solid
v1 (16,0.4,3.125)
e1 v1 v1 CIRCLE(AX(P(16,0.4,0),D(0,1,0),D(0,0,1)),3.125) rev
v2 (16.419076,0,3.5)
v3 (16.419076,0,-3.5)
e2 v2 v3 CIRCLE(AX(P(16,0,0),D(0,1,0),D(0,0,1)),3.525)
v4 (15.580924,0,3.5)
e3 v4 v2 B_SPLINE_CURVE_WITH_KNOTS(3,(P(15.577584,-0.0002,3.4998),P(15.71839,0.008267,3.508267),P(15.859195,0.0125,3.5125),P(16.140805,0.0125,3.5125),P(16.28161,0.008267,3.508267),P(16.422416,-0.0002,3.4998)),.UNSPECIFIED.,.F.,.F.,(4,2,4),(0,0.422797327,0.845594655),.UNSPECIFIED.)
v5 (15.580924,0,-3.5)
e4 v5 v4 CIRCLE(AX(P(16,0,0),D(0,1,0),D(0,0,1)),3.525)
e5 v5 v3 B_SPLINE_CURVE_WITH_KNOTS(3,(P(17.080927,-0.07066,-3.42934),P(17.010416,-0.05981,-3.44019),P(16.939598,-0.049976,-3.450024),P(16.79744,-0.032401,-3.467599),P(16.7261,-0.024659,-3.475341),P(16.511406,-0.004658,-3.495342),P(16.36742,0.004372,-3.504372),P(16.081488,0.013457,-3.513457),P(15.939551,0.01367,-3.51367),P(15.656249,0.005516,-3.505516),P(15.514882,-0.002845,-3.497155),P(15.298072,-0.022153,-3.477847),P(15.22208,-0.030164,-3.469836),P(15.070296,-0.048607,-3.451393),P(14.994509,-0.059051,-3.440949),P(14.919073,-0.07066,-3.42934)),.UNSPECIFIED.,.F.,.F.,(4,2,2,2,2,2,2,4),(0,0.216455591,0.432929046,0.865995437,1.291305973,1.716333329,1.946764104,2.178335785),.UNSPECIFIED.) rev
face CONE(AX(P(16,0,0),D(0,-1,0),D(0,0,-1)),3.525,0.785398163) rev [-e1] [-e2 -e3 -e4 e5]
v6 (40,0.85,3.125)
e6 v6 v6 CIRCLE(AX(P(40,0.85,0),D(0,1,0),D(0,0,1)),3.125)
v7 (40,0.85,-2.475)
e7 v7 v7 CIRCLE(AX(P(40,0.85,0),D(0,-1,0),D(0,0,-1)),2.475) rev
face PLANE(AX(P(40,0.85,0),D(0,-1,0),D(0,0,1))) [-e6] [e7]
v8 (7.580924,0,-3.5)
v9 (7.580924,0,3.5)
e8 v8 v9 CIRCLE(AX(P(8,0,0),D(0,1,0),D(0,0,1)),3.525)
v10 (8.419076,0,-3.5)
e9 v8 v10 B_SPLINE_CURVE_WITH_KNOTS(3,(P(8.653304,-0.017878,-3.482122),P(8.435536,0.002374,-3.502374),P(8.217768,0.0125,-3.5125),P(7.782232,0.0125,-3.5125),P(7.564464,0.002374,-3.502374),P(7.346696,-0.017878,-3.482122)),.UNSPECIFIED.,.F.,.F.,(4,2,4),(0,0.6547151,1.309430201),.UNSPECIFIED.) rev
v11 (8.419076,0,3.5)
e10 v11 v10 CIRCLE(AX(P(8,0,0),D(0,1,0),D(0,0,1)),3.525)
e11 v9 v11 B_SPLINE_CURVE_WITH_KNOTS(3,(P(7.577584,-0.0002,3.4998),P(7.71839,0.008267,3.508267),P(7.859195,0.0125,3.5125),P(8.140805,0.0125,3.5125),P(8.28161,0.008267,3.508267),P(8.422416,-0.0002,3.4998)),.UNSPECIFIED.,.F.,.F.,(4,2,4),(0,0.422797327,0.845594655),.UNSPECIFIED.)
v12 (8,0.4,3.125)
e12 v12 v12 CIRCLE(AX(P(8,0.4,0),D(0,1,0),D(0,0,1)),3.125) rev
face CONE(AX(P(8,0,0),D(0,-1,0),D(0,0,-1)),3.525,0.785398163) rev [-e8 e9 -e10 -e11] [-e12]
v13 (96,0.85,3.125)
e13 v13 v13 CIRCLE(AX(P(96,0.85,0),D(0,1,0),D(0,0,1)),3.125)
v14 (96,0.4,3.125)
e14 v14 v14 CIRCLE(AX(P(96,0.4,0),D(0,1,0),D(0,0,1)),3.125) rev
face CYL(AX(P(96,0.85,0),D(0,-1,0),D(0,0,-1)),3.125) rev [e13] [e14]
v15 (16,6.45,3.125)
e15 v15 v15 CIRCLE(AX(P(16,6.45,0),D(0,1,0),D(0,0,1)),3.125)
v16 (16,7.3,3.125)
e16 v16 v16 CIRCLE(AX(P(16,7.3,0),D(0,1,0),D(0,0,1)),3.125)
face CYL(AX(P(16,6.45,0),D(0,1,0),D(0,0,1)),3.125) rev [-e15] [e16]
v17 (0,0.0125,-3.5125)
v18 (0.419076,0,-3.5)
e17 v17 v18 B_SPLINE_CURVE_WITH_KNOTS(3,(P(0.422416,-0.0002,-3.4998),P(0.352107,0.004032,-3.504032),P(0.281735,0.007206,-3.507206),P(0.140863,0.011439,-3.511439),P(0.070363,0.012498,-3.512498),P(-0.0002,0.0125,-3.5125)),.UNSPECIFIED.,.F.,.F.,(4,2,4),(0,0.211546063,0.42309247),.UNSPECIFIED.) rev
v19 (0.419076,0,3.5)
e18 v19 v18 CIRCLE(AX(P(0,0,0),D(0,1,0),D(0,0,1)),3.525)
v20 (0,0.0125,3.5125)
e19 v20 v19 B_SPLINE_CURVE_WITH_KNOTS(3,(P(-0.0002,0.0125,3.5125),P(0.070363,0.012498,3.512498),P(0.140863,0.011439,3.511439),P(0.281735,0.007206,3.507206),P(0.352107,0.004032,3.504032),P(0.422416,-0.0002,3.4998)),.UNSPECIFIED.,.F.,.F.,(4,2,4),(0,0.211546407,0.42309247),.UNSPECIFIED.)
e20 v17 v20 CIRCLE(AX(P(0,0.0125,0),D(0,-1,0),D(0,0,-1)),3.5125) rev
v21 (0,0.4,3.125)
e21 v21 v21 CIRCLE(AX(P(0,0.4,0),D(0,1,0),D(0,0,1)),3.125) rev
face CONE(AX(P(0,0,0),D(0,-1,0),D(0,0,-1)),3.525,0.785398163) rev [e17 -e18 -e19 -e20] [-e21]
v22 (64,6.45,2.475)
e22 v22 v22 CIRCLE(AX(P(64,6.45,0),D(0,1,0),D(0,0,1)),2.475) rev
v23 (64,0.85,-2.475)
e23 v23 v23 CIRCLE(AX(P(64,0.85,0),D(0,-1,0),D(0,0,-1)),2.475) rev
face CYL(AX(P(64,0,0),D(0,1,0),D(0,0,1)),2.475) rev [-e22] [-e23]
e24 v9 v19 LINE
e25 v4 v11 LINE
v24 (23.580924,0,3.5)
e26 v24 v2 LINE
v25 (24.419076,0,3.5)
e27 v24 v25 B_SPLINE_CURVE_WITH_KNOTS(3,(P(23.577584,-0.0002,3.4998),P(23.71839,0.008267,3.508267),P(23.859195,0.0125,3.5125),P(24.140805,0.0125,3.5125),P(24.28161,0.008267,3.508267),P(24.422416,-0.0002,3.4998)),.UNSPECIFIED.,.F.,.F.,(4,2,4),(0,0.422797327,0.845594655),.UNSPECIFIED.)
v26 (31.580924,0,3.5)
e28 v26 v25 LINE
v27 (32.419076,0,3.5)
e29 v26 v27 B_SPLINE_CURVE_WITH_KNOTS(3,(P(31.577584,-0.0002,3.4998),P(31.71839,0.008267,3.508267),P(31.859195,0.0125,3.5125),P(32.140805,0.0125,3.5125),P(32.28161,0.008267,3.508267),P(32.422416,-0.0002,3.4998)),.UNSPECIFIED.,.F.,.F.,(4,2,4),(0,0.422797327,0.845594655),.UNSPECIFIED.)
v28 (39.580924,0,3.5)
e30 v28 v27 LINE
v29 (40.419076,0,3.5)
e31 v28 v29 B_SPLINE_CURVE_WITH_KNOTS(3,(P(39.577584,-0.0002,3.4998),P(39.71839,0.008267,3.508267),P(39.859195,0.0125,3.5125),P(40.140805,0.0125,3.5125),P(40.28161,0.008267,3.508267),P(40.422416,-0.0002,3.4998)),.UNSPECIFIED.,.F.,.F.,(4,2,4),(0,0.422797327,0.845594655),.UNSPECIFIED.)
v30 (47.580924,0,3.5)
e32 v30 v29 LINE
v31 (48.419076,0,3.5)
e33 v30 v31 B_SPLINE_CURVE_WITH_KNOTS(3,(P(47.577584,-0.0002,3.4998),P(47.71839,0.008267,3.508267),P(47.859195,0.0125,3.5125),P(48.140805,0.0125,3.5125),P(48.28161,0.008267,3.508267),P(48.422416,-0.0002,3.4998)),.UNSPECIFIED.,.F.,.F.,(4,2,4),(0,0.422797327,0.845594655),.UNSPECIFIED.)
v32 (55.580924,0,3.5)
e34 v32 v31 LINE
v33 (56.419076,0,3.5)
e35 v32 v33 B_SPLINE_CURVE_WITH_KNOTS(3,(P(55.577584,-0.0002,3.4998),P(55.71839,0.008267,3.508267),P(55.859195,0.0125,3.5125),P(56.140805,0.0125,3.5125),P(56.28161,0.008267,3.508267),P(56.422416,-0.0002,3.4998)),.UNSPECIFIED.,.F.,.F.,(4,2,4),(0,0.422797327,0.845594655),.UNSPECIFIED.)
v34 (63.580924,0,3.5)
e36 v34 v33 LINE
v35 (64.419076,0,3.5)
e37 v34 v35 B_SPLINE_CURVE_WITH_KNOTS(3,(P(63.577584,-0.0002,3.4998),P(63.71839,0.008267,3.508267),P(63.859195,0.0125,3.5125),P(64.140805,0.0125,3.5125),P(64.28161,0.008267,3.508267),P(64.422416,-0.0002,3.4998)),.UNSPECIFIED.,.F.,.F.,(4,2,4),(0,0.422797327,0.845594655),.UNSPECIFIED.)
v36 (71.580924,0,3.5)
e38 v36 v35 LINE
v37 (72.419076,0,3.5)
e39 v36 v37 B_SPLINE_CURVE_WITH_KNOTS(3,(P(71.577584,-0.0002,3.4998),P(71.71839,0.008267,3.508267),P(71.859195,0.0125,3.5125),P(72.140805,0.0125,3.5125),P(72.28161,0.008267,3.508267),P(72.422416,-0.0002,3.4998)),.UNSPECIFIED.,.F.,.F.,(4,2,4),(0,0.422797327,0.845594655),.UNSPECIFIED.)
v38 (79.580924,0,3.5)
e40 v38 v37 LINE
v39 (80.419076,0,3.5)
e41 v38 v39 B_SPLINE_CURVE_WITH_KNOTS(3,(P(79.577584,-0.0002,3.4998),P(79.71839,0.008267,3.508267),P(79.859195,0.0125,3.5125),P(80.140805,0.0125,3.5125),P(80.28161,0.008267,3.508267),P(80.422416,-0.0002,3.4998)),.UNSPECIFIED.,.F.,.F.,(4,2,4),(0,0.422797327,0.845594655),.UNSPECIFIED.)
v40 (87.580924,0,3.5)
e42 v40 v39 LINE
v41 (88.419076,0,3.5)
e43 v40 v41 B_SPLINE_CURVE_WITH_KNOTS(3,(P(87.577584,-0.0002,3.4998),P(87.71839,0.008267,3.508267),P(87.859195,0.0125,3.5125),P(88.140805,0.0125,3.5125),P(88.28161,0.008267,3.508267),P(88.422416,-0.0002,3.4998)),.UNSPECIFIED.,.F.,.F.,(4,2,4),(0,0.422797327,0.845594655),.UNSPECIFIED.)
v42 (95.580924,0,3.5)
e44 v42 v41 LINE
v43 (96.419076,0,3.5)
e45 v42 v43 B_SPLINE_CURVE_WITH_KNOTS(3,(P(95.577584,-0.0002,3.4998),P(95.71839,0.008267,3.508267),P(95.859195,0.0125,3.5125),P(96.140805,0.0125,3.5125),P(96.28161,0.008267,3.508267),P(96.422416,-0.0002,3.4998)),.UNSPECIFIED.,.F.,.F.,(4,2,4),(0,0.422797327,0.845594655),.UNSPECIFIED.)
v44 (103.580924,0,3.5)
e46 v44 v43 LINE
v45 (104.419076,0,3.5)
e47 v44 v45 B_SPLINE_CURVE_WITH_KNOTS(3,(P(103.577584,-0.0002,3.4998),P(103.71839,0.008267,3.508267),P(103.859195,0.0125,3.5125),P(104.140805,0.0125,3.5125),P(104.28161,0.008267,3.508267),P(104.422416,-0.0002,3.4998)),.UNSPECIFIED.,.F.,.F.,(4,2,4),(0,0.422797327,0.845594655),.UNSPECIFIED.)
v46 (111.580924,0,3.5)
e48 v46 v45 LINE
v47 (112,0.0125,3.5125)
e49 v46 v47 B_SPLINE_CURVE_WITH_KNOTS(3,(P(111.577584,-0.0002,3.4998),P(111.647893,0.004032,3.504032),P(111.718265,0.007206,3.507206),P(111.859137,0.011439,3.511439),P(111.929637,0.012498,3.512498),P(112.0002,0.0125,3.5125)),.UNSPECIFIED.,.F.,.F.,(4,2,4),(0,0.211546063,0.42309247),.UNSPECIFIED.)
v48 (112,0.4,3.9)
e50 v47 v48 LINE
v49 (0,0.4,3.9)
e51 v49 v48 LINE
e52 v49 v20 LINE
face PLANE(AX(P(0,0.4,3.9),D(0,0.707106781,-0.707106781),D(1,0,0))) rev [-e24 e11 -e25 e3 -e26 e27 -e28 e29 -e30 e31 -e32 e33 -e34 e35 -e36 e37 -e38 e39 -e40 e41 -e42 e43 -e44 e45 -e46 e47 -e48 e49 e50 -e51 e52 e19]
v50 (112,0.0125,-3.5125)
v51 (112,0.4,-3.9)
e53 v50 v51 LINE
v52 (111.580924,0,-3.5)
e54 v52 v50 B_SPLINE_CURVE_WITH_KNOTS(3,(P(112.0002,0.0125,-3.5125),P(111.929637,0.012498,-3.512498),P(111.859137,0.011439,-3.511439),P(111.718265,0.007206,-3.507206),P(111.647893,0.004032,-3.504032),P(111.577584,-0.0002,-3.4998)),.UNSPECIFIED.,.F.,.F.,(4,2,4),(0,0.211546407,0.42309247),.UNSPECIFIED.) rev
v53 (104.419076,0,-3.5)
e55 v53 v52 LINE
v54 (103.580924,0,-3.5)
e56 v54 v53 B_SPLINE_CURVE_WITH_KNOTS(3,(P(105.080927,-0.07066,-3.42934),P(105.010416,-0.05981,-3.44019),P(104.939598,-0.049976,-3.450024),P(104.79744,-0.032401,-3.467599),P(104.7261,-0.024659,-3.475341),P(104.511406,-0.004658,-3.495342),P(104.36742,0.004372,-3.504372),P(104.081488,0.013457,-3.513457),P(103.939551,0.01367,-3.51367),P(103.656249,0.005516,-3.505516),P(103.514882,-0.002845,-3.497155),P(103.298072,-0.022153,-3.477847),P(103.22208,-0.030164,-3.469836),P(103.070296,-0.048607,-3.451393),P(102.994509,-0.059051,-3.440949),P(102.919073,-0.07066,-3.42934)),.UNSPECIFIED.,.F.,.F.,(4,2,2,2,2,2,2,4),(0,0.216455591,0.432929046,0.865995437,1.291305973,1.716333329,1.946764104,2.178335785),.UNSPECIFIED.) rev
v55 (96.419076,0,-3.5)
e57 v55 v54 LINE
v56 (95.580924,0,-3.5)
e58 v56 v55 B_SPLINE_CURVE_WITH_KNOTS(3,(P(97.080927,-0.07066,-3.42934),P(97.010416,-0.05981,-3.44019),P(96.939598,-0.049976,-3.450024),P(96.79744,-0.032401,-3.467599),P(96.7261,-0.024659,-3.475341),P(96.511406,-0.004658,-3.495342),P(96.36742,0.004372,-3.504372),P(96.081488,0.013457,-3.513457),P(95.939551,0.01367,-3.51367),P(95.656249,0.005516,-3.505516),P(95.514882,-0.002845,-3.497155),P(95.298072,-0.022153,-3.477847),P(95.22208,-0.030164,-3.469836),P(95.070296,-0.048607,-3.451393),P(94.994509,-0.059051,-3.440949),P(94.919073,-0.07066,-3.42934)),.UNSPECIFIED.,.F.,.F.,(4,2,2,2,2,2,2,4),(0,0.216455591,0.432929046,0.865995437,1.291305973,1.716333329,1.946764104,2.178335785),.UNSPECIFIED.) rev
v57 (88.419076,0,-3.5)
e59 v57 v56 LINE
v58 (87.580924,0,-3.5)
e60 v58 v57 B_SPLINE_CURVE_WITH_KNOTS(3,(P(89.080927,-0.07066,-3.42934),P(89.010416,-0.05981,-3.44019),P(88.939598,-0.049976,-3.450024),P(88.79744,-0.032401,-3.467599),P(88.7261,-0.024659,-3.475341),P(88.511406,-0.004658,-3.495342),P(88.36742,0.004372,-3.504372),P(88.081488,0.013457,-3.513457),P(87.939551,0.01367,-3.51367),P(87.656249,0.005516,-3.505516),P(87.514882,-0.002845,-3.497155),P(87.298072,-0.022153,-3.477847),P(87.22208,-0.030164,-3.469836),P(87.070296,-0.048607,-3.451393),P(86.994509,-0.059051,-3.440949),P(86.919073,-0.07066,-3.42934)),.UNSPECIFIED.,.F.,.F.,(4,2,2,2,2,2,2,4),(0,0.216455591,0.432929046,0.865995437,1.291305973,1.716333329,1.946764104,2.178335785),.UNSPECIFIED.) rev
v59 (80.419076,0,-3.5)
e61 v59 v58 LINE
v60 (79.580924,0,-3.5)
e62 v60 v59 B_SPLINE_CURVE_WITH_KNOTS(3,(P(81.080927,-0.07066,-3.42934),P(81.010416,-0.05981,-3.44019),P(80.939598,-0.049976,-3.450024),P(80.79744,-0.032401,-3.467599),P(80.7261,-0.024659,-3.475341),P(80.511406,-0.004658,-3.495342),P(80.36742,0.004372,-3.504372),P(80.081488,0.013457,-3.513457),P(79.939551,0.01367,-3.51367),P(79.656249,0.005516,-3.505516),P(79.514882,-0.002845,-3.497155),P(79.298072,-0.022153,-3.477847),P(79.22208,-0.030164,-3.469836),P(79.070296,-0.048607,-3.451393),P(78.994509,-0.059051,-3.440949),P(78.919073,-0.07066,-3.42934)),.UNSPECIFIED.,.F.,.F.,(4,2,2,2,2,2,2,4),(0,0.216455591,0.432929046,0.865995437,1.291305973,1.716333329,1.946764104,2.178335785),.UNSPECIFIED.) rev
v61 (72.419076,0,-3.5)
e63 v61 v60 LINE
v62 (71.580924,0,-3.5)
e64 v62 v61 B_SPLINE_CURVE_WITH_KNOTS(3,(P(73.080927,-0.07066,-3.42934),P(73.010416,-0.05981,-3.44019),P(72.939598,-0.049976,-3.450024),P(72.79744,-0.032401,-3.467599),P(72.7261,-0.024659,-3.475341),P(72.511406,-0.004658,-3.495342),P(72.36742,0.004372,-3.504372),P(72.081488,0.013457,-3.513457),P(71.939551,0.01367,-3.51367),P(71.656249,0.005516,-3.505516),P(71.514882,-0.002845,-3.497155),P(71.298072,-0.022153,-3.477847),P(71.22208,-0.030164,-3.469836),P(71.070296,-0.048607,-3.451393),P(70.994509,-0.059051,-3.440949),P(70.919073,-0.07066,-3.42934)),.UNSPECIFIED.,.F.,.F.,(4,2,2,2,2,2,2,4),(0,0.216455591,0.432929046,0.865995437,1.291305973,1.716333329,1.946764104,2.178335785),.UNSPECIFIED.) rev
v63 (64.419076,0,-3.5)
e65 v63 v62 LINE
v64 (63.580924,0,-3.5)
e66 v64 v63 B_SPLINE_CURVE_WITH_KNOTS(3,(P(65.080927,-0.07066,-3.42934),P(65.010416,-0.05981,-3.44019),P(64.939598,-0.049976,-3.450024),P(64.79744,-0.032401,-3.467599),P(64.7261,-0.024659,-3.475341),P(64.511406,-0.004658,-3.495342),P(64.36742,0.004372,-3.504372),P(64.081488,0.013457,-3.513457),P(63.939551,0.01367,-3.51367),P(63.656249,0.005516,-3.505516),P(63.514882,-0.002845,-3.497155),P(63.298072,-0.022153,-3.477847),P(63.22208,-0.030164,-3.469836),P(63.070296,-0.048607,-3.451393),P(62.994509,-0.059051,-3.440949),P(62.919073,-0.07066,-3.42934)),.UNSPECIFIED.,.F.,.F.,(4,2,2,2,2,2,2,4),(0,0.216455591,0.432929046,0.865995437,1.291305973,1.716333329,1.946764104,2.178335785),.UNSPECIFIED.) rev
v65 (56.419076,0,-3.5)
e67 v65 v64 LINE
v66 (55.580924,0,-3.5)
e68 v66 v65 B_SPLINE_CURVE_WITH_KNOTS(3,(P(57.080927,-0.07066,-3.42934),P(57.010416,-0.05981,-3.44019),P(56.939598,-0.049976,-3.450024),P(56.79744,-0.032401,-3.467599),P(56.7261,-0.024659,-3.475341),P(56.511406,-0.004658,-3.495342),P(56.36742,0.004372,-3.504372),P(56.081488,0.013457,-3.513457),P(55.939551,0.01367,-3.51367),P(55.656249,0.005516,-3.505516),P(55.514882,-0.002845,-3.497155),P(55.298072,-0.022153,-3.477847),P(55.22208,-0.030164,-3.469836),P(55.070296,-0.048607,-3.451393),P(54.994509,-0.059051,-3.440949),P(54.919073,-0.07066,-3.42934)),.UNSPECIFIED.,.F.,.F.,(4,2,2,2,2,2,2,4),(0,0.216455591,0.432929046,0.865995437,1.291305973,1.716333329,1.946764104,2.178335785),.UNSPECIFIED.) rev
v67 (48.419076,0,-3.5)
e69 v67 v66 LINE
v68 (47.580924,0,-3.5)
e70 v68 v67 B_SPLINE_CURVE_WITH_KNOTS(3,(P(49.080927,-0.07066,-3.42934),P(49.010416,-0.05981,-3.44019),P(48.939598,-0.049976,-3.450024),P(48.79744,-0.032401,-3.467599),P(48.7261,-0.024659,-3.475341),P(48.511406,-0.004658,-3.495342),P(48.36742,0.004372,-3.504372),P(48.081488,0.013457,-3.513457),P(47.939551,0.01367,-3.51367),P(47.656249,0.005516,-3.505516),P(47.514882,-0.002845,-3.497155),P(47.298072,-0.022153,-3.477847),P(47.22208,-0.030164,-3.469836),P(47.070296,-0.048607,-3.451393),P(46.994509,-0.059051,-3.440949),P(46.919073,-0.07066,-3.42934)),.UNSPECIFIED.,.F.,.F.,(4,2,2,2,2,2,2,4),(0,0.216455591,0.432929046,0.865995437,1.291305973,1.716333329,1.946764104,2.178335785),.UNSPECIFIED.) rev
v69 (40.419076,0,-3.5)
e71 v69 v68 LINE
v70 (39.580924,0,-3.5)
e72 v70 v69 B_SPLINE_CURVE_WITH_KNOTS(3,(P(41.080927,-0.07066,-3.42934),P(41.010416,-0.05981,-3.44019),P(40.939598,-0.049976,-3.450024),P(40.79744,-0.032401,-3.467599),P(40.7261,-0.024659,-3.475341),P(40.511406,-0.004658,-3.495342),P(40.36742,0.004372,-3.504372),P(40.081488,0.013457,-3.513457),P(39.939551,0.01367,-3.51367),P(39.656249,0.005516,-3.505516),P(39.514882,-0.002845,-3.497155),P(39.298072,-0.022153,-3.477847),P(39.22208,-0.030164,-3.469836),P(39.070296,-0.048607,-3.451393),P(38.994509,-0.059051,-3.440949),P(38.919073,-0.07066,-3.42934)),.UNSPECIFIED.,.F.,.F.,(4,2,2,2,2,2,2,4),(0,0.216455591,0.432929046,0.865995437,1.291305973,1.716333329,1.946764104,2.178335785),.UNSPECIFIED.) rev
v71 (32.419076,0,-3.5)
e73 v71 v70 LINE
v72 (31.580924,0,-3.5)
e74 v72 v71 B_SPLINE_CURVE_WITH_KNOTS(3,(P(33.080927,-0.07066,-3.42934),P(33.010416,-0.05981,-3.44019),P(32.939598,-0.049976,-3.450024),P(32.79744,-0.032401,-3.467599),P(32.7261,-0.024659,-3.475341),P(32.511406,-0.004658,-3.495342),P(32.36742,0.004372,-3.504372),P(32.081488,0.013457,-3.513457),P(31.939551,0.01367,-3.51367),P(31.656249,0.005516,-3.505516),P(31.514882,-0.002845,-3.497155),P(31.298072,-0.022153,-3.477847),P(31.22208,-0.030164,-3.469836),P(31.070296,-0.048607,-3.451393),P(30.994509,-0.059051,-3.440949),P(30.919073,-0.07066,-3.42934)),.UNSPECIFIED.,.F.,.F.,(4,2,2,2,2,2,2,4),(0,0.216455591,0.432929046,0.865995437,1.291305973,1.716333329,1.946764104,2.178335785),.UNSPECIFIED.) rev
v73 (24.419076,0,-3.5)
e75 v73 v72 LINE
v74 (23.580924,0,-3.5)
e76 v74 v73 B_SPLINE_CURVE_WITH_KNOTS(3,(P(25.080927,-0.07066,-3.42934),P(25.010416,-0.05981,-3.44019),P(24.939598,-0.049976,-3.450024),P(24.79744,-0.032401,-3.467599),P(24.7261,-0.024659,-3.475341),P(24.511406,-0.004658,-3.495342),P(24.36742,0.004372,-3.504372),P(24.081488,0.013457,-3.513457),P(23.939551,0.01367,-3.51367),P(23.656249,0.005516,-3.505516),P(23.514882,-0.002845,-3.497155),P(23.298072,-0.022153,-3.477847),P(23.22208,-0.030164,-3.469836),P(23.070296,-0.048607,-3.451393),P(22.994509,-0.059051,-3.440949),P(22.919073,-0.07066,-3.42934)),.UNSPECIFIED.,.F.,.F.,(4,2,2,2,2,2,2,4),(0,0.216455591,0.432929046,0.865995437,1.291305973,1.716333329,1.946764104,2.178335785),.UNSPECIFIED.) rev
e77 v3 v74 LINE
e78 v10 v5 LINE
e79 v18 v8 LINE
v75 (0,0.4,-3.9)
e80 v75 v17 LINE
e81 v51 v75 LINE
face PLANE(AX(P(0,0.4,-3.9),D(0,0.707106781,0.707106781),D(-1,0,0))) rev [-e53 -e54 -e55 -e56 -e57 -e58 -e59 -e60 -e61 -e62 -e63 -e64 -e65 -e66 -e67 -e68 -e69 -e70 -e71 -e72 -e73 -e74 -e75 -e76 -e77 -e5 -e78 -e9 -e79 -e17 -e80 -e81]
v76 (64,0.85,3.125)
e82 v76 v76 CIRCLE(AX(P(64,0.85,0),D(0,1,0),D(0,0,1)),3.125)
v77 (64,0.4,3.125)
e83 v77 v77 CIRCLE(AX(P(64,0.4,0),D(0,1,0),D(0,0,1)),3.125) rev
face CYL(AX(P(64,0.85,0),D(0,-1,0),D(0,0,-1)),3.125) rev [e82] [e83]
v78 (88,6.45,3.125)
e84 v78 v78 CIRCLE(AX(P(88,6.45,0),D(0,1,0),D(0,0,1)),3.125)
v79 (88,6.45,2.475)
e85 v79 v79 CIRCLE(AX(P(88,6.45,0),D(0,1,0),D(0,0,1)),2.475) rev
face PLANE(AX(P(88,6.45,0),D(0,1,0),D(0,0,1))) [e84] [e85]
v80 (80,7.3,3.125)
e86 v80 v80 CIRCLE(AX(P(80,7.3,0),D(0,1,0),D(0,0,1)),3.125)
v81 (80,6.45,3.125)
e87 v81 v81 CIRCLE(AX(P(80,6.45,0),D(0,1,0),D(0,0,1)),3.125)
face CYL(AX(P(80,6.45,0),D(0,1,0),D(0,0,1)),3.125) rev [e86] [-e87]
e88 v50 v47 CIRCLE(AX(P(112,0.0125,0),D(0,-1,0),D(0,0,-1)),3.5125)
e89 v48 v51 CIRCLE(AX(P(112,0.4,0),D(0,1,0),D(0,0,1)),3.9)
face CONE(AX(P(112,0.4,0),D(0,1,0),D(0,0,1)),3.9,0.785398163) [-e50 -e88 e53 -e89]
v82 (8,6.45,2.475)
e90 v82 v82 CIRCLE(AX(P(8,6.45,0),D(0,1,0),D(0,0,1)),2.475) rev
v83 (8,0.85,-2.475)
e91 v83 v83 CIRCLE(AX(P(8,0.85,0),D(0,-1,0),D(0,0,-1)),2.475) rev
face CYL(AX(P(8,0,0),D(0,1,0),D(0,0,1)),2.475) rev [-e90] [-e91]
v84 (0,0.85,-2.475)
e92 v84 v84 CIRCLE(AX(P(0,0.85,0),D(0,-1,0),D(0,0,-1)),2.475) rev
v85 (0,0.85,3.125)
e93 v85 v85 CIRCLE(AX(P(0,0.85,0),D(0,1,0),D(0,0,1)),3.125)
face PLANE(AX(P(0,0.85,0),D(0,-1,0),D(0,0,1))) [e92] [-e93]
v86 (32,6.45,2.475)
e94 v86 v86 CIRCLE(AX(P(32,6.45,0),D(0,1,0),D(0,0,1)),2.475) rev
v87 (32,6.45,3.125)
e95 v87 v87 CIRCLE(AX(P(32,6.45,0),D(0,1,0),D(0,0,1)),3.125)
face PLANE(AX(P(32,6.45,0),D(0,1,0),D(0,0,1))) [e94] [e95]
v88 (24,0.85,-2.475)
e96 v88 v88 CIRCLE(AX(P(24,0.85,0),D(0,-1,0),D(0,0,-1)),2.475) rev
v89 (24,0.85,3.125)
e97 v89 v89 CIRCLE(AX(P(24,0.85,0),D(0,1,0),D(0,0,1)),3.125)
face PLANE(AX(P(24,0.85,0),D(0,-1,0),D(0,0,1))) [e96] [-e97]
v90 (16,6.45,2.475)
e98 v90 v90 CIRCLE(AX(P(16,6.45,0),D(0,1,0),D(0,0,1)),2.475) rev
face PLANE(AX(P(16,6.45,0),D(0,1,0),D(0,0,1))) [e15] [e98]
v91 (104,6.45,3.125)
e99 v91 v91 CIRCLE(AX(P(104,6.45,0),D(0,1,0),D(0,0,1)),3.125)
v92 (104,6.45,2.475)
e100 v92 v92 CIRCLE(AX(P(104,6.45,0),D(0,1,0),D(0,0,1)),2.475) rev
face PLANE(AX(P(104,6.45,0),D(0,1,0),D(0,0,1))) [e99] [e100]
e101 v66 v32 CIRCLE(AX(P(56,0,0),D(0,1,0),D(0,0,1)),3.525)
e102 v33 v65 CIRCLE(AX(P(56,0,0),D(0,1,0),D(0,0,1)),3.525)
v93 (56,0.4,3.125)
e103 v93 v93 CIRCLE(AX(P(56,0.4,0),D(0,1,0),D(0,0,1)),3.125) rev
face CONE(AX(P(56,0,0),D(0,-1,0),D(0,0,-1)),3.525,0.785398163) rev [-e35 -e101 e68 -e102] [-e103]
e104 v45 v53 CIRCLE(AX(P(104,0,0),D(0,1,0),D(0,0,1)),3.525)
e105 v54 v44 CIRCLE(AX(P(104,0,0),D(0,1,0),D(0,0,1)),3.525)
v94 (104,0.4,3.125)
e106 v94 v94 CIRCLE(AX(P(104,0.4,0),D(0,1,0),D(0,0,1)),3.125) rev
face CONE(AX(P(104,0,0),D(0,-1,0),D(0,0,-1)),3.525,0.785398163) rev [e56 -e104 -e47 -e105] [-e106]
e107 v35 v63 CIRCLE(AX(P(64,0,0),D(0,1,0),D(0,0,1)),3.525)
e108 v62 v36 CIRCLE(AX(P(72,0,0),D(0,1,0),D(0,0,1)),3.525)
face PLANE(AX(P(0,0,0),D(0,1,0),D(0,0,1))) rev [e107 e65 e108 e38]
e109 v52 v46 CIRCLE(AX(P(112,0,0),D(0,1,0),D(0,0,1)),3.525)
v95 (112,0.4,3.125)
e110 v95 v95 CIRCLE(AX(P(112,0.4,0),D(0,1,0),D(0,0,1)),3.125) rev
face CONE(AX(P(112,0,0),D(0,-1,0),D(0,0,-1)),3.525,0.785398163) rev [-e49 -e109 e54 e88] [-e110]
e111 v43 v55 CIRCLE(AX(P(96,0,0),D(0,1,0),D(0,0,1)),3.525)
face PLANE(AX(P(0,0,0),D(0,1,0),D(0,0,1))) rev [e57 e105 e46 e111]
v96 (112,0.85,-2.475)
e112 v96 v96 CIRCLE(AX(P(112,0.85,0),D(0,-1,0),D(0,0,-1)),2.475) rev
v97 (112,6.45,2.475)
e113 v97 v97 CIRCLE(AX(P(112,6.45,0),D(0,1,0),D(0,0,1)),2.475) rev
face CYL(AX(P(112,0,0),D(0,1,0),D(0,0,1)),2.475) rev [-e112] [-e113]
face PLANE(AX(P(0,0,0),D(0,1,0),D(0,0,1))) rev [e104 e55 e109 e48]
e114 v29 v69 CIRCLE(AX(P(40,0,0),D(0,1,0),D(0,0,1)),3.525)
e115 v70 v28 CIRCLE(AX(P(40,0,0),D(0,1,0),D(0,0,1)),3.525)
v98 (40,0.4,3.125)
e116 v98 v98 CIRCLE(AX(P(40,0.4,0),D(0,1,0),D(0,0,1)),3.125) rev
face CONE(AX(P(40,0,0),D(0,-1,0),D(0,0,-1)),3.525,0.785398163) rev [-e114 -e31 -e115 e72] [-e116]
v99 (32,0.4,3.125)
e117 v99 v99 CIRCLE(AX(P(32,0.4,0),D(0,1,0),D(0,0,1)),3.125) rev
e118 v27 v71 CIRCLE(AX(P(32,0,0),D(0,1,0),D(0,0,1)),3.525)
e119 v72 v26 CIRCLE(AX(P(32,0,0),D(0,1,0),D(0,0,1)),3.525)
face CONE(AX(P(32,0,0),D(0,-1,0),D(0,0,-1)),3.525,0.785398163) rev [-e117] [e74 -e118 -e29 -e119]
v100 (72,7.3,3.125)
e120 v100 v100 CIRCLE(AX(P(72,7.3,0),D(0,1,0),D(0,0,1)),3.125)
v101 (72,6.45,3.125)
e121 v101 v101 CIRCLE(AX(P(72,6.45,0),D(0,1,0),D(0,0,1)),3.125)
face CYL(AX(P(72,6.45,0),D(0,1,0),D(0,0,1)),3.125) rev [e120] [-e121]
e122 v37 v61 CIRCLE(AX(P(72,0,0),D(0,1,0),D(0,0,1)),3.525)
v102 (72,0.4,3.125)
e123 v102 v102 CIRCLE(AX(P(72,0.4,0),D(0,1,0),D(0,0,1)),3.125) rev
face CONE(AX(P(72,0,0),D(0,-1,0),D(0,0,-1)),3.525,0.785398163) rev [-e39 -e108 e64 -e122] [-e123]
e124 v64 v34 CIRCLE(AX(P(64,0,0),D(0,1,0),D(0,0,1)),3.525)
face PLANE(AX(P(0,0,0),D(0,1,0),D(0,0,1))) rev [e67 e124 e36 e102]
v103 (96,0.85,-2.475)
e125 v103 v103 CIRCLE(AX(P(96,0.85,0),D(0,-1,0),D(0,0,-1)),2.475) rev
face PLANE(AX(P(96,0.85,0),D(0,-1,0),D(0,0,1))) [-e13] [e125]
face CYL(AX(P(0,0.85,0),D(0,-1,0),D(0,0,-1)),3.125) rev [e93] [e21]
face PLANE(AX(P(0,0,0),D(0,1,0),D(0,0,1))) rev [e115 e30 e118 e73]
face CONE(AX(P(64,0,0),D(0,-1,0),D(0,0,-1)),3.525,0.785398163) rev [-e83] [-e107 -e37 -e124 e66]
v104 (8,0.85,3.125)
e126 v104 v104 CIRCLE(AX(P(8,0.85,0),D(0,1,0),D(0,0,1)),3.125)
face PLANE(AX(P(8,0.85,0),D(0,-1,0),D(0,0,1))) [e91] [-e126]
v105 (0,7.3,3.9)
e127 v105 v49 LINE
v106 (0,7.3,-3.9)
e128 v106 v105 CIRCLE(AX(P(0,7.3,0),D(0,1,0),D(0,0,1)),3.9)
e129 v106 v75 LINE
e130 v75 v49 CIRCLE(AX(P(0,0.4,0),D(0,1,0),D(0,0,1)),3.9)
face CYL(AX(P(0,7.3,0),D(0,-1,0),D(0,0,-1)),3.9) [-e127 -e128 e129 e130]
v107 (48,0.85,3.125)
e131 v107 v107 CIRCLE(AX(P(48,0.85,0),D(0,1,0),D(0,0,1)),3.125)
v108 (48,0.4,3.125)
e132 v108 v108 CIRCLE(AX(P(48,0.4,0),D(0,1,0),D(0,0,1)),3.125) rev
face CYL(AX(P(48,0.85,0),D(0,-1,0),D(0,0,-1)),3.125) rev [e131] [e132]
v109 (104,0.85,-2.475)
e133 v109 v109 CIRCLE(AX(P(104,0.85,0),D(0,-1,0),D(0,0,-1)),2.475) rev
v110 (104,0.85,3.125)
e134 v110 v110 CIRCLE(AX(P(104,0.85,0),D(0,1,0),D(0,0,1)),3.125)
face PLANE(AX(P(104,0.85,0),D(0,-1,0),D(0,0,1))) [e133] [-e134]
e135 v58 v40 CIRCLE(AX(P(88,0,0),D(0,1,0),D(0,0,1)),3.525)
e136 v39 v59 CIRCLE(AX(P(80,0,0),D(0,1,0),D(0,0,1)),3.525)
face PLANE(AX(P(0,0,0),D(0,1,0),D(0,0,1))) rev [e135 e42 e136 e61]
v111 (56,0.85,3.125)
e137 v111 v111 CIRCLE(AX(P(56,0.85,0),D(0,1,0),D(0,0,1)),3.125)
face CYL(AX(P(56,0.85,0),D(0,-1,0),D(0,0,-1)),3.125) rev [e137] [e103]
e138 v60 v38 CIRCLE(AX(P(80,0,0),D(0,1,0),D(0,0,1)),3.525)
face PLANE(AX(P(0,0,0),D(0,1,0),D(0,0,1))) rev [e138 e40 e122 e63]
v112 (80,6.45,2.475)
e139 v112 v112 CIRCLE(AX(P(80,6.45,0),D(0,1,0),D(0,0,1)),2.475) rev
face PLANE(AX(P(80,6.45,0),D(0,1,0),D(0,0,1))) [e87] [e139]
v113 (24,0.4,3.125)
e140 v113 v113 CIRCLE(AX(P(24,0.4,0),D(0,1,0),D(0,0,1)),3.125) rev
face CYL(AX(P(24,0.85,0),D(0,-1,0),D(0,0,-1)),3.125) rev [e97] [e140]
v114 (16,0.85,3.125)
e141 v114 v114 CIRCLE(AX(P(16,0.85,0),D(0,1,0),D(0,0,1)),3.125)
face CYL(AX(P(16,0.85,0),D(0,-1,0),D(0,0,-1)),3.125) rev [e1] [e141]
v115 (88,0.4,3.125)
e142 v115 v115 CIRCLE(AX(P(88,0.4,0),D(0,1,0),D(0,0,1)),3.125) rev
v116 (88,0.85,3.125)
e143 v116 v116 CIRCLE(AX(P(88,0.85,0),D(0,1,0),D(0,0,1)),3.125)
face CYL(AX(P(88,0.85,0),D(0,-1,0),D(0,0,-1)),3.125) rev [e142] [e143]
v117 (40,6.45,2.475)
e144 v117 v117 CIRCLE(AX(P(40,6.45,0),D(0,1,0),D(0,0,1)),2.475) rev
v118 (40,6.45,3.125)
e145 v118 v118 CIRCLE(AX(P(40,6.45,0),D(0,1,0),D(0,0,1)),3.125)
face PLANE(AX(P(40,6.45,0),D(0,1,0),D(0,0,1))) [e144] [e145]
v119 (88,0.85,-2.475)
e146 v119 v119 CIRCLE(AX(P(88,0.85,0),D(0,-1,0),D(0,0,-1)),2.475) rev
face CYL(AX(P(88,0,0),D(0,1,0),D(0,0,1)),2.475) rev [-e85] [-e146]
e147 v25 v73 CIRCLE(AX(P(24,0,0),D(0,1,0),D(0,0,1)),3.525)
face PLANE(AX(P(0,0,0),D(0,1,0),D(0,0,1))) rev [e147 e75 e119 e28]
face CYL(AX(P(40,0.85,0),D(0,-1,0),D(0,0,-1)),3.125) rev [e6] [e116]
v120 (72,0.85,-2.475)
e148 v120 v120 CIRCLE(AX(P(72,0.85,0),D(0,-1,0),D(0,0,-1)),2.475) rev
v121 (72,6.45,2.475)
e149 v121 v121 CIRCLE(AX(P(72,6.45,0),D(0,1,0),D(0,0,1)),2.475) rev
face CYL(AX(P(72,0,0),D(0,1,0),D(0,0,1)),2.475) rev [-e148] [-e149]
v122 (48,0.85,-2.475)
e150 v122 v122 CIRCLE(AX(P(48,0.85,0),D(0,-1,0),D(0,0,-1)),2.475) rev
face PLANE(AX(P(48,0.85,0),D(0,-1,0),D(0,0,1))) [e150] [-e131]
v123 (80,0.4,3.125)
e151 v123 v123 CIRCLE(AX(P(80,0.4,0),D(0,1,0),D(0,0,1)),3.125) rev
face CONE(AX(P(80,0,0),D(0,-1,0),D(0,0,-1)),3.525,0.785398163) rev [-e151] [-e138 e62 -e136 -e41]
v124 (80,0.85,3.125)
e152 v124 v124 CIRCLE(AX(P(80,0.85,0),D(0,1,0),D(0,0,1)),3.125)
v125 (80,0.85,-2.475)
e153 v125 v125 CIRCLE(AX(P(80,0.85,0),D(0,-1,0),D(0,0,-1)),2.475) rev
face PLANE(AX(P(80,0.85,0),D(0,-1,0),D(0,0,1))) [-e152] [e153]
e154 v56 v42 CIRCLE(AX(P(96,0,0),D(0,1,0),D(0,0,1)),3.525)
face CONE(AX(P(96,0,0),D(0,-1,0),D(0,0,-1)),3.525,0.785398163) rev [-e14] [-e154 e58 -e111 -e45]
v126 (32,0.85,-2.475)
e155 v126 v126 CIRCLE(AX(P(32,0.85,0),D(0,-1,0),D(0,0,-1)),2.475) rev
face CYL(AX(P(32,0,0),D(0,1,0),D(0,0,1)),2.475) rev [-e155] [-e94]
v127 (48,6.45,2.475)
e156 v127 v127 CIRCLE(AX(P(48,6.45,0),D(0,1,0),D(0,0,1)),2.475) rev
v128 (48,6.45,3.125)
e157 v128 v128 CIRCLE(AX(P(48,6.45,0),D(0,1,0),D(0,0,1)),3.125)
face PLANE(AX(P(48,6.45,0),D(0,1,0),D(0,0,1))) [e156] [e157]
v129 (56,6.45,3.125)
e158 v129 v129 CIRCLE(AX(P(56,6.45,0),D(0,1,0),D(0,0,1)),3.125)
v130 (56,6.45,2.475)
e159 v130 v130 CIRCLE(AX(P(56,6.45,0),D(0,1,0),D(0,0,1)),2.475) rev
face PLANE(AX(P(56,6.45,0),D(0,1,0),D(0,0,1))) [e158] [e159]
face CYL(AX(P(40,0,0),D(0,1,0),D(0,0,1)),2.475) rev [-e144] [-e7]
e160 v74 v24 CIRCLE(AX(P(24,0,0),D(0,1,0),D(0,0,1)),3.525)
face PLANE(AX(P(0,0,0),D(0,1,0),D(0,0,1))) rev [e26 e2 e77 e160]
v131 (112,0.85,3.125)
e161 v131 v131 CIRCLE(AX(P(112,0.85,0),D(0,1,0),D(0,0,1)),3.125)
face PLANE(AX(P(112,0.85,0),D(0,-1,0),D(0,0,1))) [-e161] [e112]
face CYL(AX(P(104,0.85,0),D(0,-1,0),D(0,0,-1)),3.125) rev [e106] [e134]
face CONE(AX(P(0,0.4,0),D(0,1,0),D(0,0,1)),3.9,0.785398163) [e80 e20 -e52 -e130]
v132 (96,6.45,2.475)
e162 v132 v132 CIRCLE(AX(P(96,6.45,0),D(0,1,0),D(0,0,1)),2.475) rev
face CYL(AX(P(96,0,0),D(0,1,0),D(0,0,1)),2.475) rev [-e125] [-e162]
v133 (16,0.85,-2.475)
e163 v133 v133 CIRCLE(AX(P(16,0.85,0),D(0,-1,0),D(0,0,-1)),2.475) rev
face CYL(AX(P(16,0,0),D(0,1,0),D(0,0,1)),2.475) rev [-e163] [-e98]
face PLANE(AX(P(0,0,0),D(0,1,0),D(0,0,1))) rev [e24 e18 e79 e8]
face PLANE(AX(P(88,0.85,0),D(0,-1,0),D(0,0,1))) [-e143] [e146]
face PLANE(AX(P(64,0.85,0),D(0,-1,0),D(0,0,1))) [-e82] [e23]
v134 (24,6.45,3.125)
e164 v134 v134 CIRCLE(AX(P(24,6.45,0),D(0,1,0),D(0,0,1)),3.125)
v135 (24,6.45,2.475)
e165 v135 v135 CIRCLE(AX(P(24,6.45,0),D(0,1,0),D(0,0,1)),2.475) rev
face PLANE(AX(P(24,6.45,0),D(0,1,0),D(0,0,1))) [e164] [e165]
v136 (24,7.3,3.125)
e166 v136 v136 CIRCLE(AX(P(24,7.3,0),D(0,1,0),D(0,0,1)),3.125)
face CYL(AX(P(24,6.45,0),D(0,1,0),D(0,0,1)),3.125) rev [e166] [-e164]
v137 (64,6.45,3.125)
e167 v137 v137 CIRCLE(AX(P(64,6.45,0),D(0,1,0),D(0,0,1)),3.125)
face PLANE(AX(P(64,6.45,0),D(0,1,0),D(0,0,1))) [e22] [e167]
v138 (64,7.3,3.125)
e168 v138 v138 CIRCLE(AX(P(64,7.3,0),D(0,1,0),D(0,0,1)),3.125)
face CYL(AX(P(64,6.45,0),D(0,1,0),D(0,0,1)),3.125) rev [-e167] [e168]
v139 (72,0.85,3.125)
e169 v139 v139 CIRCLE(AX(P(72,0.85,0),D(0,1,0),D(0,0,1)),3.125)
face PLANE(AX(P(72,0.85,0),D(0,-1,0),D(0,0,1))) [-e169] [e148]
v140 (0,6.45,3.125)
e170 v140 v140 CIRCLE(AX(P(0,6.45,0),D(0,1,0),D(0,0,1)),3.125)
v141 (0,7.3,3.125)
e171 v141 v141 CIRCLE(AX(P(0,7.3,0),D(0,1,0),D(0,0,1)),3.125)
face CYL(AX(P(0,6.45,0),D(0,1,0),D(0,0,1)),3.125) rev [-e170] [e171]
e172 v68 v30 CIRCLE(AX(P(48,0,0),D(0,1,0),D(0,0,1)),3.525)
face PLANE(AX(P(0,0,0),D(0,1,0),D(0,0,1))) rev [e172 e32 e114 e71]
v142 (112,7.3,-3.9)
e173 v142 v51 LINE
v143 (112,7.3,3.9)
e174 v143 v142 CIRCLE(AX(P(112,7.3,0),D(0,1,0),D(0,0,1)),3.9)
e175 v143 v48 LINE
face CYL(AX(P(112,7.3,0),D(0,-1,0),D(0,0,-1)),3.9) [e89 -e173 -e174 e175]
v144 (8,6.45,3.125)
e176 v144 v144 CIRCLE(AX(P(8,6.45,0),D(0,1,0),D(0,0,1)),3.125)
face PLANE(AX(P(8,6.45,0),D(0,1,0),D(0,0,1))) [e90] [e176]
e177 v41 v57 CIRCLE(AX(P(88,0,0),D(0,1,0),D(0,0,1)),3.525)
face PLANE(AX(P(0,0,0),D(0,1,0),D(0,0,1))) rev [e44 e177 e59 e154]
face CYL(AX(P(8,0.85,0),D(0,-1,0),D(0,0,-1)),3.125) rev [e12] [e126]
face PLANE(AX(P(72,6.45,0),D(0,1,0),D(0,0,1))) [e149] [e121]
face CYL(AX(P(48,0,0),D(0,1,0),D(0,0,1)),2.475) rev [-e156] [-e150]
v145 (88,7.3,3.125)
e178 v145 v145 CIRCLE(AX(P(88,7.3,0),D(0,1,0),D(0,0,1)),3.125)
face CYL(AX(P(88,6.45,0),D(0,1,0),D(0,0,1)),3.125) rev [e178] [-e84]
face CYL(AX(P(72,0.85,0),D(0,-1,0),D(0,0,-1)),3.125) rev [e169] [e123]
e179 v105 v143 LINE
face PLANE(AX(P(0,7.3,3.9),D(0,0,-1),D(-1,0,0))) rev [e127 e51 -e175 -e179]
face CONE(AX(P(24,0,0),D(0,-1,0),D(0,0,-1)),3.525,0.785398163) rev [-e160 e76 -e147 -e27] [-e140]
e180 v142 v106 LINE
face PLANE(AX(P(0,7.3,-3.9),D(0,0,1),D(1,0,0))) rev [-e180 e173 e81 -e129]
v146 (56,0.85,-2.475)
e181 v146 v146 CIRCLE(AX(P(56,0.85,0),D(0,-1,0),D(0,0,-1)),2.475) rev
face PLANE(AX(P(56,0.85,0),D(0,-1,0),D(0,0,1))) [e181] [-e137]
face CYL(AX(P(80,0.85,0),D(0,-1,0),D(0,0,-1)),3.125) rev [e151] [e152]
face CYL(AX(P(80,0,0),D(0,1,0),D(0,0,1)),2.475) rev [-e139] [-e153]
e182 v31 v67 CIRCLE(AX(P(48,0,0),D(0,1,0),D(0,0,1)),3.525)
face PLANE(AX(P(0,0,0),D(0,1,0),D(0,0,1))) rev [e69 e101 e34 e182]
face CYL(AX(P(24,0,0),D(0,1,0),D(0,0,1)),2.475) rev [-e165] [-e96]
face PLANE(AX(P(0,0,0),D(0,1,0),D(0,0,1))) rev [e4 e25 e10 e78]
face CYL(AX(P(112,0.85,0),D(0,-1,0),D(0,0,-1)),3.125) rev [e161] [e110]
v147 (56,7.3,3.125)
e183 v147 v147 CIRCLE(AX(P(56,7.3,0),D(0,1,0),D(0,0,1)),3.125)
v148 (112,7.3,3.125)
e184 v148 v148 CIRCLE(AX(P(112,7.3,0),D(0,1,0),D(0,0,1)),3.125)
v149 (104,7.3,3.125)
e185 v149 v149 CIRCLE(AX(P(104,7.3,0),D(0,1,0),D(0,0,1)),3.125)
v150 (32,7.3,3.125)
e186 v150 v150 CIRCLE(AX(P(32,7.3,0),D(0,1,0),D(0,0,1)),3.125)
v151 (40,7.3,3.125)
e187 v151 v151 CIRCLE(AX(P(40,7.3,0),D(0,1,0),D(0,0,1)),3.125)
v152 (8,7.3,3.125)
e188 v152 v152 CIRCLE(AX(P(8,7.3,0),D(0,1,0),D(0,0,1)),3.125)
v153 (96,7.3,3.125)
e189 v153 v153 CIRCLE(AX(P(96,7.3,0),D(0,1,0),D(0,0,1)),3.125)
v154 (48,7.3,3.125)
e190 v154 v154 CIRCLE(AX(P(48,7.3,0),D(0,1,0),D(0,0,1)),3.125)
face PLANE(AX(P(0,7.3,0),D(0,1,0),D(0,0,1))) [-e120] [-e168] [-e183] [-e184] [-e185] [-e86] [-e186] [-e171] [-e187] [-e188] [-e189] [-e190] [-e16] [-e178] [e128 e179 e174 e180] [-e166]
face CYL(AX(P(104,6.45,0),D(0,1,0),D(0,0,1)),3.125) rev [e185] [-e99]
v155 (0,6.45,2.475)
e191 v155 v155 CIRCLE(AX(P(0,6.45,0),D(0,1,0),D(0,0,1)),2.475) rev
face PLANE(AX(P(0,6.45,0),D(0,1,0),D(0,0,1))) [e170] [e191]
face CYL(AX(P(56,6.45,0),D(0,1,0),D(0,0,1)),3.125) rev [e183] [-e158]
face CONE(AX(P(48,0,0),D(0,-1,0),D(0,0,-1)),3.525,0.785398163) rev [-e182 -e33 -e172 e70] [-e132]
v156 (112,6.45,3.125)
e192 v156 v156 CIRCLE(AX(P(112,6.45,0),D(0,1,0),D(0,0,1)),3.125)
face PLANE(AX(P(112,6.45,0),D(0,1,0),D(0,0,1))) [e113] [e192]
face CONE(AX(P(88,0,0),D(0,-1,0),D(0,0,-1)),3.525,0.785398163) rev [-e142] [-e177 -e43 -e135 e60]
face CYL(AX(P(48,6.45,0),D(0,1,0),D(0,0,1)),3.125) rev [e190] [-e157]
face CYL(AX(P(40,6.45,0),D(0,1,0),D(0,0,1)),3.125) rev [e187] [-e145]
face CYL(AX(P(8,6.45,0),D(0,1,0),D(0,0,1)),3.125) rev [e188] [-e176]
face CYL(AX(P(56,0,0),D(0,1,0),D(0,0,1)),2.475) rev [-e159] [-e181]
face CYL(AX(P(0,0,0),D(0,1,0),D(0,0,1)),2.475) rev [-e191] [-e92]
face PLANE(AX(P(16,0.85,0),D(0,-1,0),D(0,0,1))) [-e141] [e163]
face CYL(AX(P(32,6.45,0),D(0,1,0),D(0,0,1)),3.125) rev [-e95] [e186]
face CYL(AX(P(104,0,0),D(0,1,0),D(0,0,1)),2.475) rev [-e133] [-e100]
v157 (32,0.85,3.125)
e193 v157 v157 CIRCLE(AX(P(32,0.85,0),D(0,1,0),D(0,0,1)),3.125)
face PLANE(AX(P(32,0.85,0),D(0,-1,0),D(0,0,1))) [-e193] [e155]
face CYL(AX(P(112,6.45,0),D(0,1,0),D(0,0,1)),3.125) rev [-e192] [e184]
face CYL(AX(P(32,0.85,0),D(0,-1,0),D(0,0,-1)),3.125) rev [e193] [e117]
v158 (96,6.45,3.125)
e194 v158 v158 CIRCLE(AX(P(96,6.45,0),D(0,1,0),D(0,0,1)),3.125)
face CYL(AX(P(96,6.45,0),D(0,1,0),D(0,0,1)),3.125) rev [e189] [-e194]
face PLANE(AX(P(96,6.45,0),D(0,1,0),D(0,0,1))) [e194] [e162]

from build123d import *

# Parameters (mm, degrees)
BOSS_EXTRUDE1_DEPTH        = 7.3
SKETCH2_R                  = 2.475
CUT_EXTRUDE1_DEPTH         = 117.195137592
SKETCH3_R                  = 3.125
CUT_EXTRUDE2_DEPTH         = 0.85
LPATTERN1_COUNT            = 15
LPATTERN1_PITCH            = 8
LPATTERN1_COPY_1_SKETCH_R  = 3.125
LPATTERN1_COPY_1_DEPTH     = 0.85
LPATTERN1_COPY_2_SKETCH_R  = 3.125
LPATTERN1_COPY_2_DEPTH     = 0.85
LPATTERN1_COPY_3_SKETCH_R  = 3.125
LPATTERN1_COPY_3_DEPTH     = 0.85
LPATTERN1_COPY_4_SKETCH_R  = 3.125
LPATTERN1_COPY_4_DEPTH     = 0.85
LPATTERN1_COPY_5_SKETCH_R  = 3.125
LPATTERN1_COPY_5_DEPTH     = 0.85
LPATTERN1_COPY_6_SKETCH_R  = 3.125
LPATTERN1_COPY_6_DEPTH     = 0.85
LPATTERN1_COPY_7_SKETCH_R  = 3.125
LPATTERN1_COPY_7_DEPTH     = 0.85
LPATTERN1_COPY_8_SKETCH_R  = 3.125
LPATTERN1_COPY_8_DEPTH     = 0.85
LPATTERN1_COPY_9_SKETCH_R  = 3.125
LPATTERN1_COPY_9_DEPTH     = 0.85
LPATTERN1_COPY_10_SKETCH_R = 3.125
LPATTERN1_COPY_10_DEPTH    = 0.85
LPATTERN1_COPY_11_SKETCH_R = 3.125
LPATTERN1_COPY_11_DEPTH    = 0.85
LPATTERN1_COPY_12_SKETCH_R = 3.125
LPATTERN1_COPY_12_DEPTH    = 0.85
LPATTERN1_COPY_13_SKETCH_R = 3.125
LPATTERN1_COPY_13_DEPTH    = 0.85
LPATTERN1_COPY_14_SKETCH_R = 3.125
LPATTERN1_COPY_14_DEPTH    = 0.85
CHAMFER1_SIZE              = 0.4


with BuildPart() as part:
    # Sketch1 → Boss-Extrude1 (new body)
    with BuildSketch(Plane(origin=(0, 0, 0), x_dir=(1, 0, 0), z_dir=(0, 1, 0))):
        with BuildLine():
            Line((0, 3.9), (112, 3.9))
            ThreePointArc((112, 3.9), (115.9, 0), (112, -3.9))
            Line((112, -3.9), (0, -3.9))
            ThreePointArc((0, -3.9), (-3.9, 0), (0, 3.9))
        make_face()
    extrude(amount=BOSS_EXTRUDE1_DEPTH)

    # Sketch2 → Cut-Extrude1 (cut, through all)
    with BuildSketch(Plane(origin=(0, 7.3, 0), x_dir=(1, 0, 0), z_dir=(0, 1, 0))):
        with Locations(Location((0, 0, 0), (0, 0, 270))):
            Circle(SKETCH2_R)
    cut_extrude1 = extrude(amount=-CUT_EXTRUDE1_DEPTH, mode=Mode.SUBTRACT)

    # Sketch3 → Cut-Extrude2 (cut)
    with BuildSketch(Plane(origin=(0, 7.3, 0), x_dir=(1, 0, 0), z_dir=(0, 1, 0))):
        with Locations(Location((0, 0, 0), (0, 0, 270))):
            Circle(SKETCH3_R)
    cut_extrude2 = extrude(amount=-CUT_EXTRUDE2_DEPTH, mode=Mode.SUBTRACT)

    # Mirror1: Cut-Extrude2 across plane
    add(cut_extrude2.mirror(Plane.ZX.offset(3.65)), mode=Mode.SUBTRACT)

    # LPattern1: Cut-Extrude1, Cut-Extrude2 ×15
    with Locations(*[(i * LPATTERN1_PITCH, 0, 0) for i in range(1, LPATTERN1_COUNT)]):
        add(cut_extrude1, mode=Mode.SUBTRACT)
        add(cut_extrude2, mode=Mode.SUBTRACT)

    # LPattern1 copy 1 sketch → LPattern1 copy 1 (cut)
    with BuildSketch(Plane(origin=(8, 0, 0), x_dir=(1, 0, 0), z_dir=(0, -1, 0))):
        Circle(LPATTERN1_COPY_1_SKETCH_R)
    extrude(amount=-LPATTERN1_COPY_1_DEPTH, mode=Mode.SUBTRACT)

    # LPattern1 copy 2 sketch → LPattern1 copy 2 (cut)
    with BuildSketch(Plane(origin=(16, 0, 0), x_dir=(1, 0, 0), z_dir=(0, -1, 0))):
        Circle(LPATTERN1_COPY_2_SKETCH_R)
    extrude(amount=-LPATTERN1_COPY_2_DEPTH, mode=Mode.SUBTRACT)

    # LPattern1 copy 3 sketch → LPattern1 copy 3 (cut)
    with BuildSketch(Plane(origin=(24, 0, 0), x_dir=(1, 0, 0), z_dir=(0, -1, 0))):
        Circle(LPATTERN1_COPY_3_SKETCH_R)
    extrude(amount=-LPATTERN1_COPY_3_DEPTH, mode=Mode.SUBTRACT)

    # LPattern1 copy 4 sketch → LPattern1 copy 4 (cut)
    with BuildSketch(Plane(origin=(32, 0, 0), x_dir=(1, 0, 0), z_dir=(0, -1, 0))):
        Circle(LPATTERN1_COPY_4_SKETCH_R)
    extrude(amount=-LPATTERN1_COPY_4_DEPTH, mode=Mode.SUBTRACT)

    # LPattern1 copy 5 sketch → LPattern1 copy 5 (cut)
    with BuildSketch(Plane(origin=(40, 0, 0), x_dir=(1, 0, 0), z_dir=(0, -1, 0))):
        Circle(LPATTERN1_COPY_5_SKETCH_R)
    extrude(amount=-LPATTERN1_COPY_5_DEPTH, mode=Mode.SUBTRACT)

    # LPattern1 copy 6 sketch → LPattern1 copy 6 (cut)
    with BuildSketch(Plane(origin=(48, 0, 0), x_dir=(1, 0, 0), z_dir=(0, -1, 0))):
        Circle(LPATTERN1_COPY_6_SKETCH_R)
    extrude(amount=-LPATTERN1_COPY_6_DEPTH, mode=Mode.SUBTRACT)

    # LPattern1 copy 7 sketch → LPattern1 copy 7 (cut)
    with BuildSketch(Plane(origin=(56, 0, 0), x_dir=(1, 0, 0), z_dir=(0, -1, 0))):
        Circle(LPATTERN1_COPY_7_SKETCH_R)
    extrude(amount=-LPATTERN1_COPY_7_DEPTH, mode=Mode.SUBTRACT)

    # LPattern1 copy 8 sketch → LPattern1 copy 8 (cut)
    with BuildSketch(Plane(origin=(64, 0, 0), x_dir=(1, 0, 0), z_dir=(0, -1, 0))):
        Circle(LPATTERN1_COPY_8_SKETCH_R)
    extrude(amount=-LPATTERN1_COPY_8_DEPTH, mode=Mode.SUBTRACT)

    # LPattern1 copy 9 sketch → LPattern1 copy 9 (cut)
    with BuildSketch(Plane(origin=(72, 0, 0), x_dir=(1, 0, 0), z_dir=(0, -1, 0))):
        Circle(LPATTERN1_COPY_9_SKETCH_R)
    extrude(amount=-LPATTERN1_COPY_9_DEPTH, mode=Mode.SUBTRACT)

    # LPattern1 copy 10 sketch → LPattern1 copy 10 (cut)
    with BuildSketch(Plane(origin=(80, 0, 0), x_dir=(1, 0, 0), z_dir=(0, -1, 0))):
        Circle(LPATTERN1_COPY_10_SKETCH_R)
    extrude(amount=-LPATTERN1_COPY_10_DEPTH, mode=Mode.SUBTRACT)

    # LPattern1 copy 11 sketch → LPattern1 copy 11 (cut)
    with BuildSketch(Plane(origin=(88, 0, 0), x_dir=(1, 0, 0), z_dir=(0, -1, 0))):
        Circle(LPATTERN1_COPY_11_SKETCH_R)
    extrude(amount=-LPATTERN1_COPY_11_DEPTH, mode=Mode.SUBTRACT)

    # LPattern1 copy 12 sketch → LPattern1 copy 12 (cut)
    with BuildSketch(Plane(origin=(96, 0, 0), x_dir=(1, 0, 0), z_dir=(0, -1, 0))):
        Circle(LPATTERN1_COPY_12_SKETCH_R)
    extrude(amount=-LPATTERN1_COPY_12_DEPTH, mode=Mode.SUBTRACT)

    # LPattern1 copy 13 sketch → LPattern1 copy 13 (cut)
    with BuildSketch(Plane(origin=(104, 0, 0), x_dir=(1, 0, 0), z_dir=(0, -1, 0))):
        Circle(LPATTERN1_COPY_13_SKETCH_R)
    extrude(amount=-LPATTERN1_COPY_13_DEPTH, mode=Mode.SUBTRACT)

    # LPattern1 copy 14 sketch → LPattern1 copy 14 (cut)
    with BuildSketch(Plane(origin=(112, 0, 0), x_dir=(1, 0, 0), z_dir=(0, -1, 0))):
        Circle(LPATTERN1_COPY_14_SKETCH_R)
    extrude(amount=-LPATTERN1_COPY_14_DEPTH, mode=Mode.SUBTRACT)

    # Chamfer1
    # the kernel refuses this chamfer: 0.4 mm, written as the material it takes off along each edge
    with BuildSketch(Plane(origin=(8, 0, 0), x_dir=(1, 0, 0), z_dir=(0, 0, -1))) as chamfer1_piece_1:
        Polygon((3.125 + CHAMFER1_SIZE, 0), (3.125, -CHAMFER1_SIZE), (3.125, 0), align=None)
    revolve(axis=Axis((8, 0, 0), (0, -1, 0)), mode=Mode.SUBTRACT)
    with BuildSketch(Plane(origin=(16, 0, 0), x_dir=(1, 0, 0), z_dir=(0, 0, -1))) as chamfer1_piece_2:
        Polygon((3.125 + CHAMFER1_SIZE, 0), (3.125, -CHAMFER1_SIZE), (3.125, 0), align=None)
    revolve(axis=Axis((16, 0, 0), (0, -1, 0)), mode=Mode.SUBTRACT)
    with BuildSketch(Plane(origin=(24, 0, 0), x_dir=(1, 0, 0), z_dir=(0, 0, -1))) as chamfer1_piece_3:
        Polygon((3.125 + CHAMFER1_SIZE, 0), (3.125, -CHAMFER1_SIZE), (3.125, 0), align=None)
    revolve(axis=Axis((24, 0, 0), (0, -1, 0)), mode=Mode.SUBTRACT)
    with BuildSketch(Plane(origin=(32, 0, 0), x_dir=(1, 0, 0), z_dir=(0, 0, -1))) as chamfer1_piece_4:
        Polygon((3.125 + CHAMFER1_SIZE, 0), (3.125, -CHAMFER1_SIZE), (3.125, 0), align=None)
    revolve(axis=Axis((32, 0, 0), (0, -1, 0)), mode=Mode.SUBTRACT)
    with BuildSketch(Plane(origin=(40, 0, 0), x_dir=(1, 0, 0), z_dir=(0, 0, -1))) as chamfer1_piece_5:
        Polygon((3.125 + CHAMFER1_SIZE, 0), (3.125, -CHAMFER1_SIZE), (3.125, 0), align=None)
    revolve(axis=Axis((40, 0, 0), (0, -1, 0)), mode=Mode.SUBTRACT)
    with BuildSketch(Plane(origin=(48, 0, 0), x_dir=(1, 0, 0), z_dir=(0, 0, -1))) as chamfer1_piece_6:
        Polygon((3.125 + CHAMFER1_SIZE, 0), (3.125, -CHAMFER1_SIZE), (3.125, 0), align=None)
    revolve(axis=Axis((48, 0, 0), (0, -1, 0)), mode=Mode.SUBTRACT)
    with BuildSketch(Plane(origin=(56, 0, 0), x_dir=(1, 0, 0), z_dir=(0, 0, -1))) as chamfer1_piece_7:
        Polygon((3.125 + CHAMFER1_SIZE, 0), (3.125, -CHAMFER1_SIZE), (3.125, 0), align=None)
    revolve(axis=Axis((56, 0, 0), (0, -1, 0)), mode=Mode.SUBTRACT)
    with BuildSketch(Plane(origin=(64, 0, 0), x_dir=(1, 0, 0), z_dir=(0, 0, -1))) as chamfer1_piece_8:
        Polygon((3.125 + CHAMFER1_SIZE, 0), (3.125, -CHAMFER1_SIZE), (3.125, 0), align=None)
    revolve(axis=Axis((64, 0, 0), (0, -1, 0)), mode=Mode.SUBTRACT)
    with BuildSketch(Plane(origin=(72, 0, 0), x_dir=(1, 0, 0), z_dir=(0, 0, -1))) as chamfer1_piece_9:
        Polygon((3.125 + CHAMFER1_SIZE, 0), (3.125, -CHAMFER1_SIZE), (3.125, 0), align=None)
    revolve(axis=Axis((72, 0, 0), (0, -1, 0)), mode=Mode.SUBTRACT)
    with BuildSketch(Plane(origin=(80, 0, 0), x_dir=(1, 0, 0), z_dir=(0, 0, -1))) as chamfer1_piece_10:
        Polygon((3.125 + CHAMFER1_SIZE, 0), (3.125, -CHAMFER1_SIZE), (3.125, 0), align=None)
    revolve(axis=Axis((80, 0, 0), (0, -1, 0)), mode=Mode.SUBTRACT)
    with BuildSketch(Plane(origin=(88, 0, 0), x_dir=(1, 0, 0), z_dir=(0, 0, -1))) as chamfer1_piece_11:
        Polygon((3.125 + CHAMFER1_SIZE, 0), (3.125, -CHAMFER1_SIZE), (3.125, 0), align=None)
    revolve(axis=Axis((88, 0, 0), (0, -1, 0)), mode=Mode.SUBTRACT)
    with BuildSketch(Plane(origin=(96, 0, 0), x_dir=(1, 0, 0), z_dir=(0, 0, -1))) as chamfer1_piece_12:
        Polygon((3.125 + CHAMFER1_SIZE, 0), (3.125, -CHAMFER1_SIZE), (3.125, 0), align=None)
    revolve(axis=Axis((96, 0, 0), (0, -1, 0)), mode=Mode.SUBTRACT)
    with BuildSketch(Plane(origin=(104, 0, 0), x_dir=(1, 0, 0), z_dir=(0, 0, -1))) as chamfer1_piece_13:
        Polygon((3.125 + CHAMFER1_SIZE, 0), (3.125, -CHAMFER1_SIZE), (3.125, 0), align=None)
    revolve(axis=Axis((104, 0, 0), (0, -1, 0)), mode=Mode.SUBTRACT)
    with BuildSketch(Plane(origin=(112, 0, 0), x_dir=(1, 0, 0), z_dir=(0, 0, -1))) as chamfer1_piece_14:
        Polygon((3.125 + CHAMFER1_SIZE, 0), (3.125, -CHAMFER1_SIZE), (3.125, 0), align=None)
    revolve(axis=Axis((112, 0, 0), (0, -1, 0)), mode=Mode.SUBTRACT)
    with BuildSketch(Plane(origin=(0, 0, 0), x_dir=(0, 0, 1), z_dir=(-1, 0, 0))) as chamfer1_piece_15:
        Polygon((3.125 + CHAMFER1_SIZE, 0), (3.125, CHAMFER1_SIZE), (3.125, 0), align=None)
    revolve(axis=Axis((0, 0, 0), (0, 1, 0)), mode=Mode.SUBTRACT)
    with BuildSketch(Plane(origin=(0, 0, -3.9), x_dir=(0, -0.027495876610586386, 0.9996219169112968), z_dir=(1, 0, 0))) as chamfer1_piece_16:
        Polygon((CHAMFER1_SIZE * 0.999621916911, -CHAMFER1_SIZE * 0.0274958766106), (-CHAMFER1_SIZE * 0.0274958766106, -CHAMFER1_SIZE * 0.999621916911), (0, 0), align=None)
    extrude(amount=112, mode=Mode.SUBTRACT)
    with BuildSketch(Plane(origin=(112, 0, 0), x_dir=(0, 0, -1), z_dir=(-1, 0, 0))) as chamfer1_piece_17:
        Polygon((3.9, -CHAMFER1_SIZE), (3.9 - CHAMFER1_SIZE, 0), (3.9, 0), align=None)
    revolve(axis=Axis((112, 0, 0), (0, -1, 0)), revolution_arc=180, mode=Mode.SUBTRACT)
    with BuildSketch(Plane(origin=(112, 0, 3.9), x_dir=(0, 0.9996219169112968, 0.027495876610586275), z_dir=(-1, 0, 0))) as chamfer1_piece_18:
        Polygon((CHAMFER1_SIZE * 0.999621916911, CHAMFER1_SIZE * 0.0274958766106), (-CHAMFER1_SIZE * 0.0274958766106, CHAMFER1_SIZE * 0.999621916911), (0, 0), align=None)
    extrude(amount=112, mode=Mode.SUBTRACT)
    with BuildSketch(Plane(origin=(0, 0, 0), x_dir=(0, 0, 1), z_dir=(1, 0, 0))) as chamfer1_piece_19:
        Polygon((3.9, -CHAMFER1_SIZE), (3.9 - CHAMFER1_SIZE, 0), (3.9, 0), align=None)
    revolve(axis=Axis((0, 0, 0), (0, -1, 0)), revolution_arc=180, mode=Mode.SUBTRACT)


solid = part.part
